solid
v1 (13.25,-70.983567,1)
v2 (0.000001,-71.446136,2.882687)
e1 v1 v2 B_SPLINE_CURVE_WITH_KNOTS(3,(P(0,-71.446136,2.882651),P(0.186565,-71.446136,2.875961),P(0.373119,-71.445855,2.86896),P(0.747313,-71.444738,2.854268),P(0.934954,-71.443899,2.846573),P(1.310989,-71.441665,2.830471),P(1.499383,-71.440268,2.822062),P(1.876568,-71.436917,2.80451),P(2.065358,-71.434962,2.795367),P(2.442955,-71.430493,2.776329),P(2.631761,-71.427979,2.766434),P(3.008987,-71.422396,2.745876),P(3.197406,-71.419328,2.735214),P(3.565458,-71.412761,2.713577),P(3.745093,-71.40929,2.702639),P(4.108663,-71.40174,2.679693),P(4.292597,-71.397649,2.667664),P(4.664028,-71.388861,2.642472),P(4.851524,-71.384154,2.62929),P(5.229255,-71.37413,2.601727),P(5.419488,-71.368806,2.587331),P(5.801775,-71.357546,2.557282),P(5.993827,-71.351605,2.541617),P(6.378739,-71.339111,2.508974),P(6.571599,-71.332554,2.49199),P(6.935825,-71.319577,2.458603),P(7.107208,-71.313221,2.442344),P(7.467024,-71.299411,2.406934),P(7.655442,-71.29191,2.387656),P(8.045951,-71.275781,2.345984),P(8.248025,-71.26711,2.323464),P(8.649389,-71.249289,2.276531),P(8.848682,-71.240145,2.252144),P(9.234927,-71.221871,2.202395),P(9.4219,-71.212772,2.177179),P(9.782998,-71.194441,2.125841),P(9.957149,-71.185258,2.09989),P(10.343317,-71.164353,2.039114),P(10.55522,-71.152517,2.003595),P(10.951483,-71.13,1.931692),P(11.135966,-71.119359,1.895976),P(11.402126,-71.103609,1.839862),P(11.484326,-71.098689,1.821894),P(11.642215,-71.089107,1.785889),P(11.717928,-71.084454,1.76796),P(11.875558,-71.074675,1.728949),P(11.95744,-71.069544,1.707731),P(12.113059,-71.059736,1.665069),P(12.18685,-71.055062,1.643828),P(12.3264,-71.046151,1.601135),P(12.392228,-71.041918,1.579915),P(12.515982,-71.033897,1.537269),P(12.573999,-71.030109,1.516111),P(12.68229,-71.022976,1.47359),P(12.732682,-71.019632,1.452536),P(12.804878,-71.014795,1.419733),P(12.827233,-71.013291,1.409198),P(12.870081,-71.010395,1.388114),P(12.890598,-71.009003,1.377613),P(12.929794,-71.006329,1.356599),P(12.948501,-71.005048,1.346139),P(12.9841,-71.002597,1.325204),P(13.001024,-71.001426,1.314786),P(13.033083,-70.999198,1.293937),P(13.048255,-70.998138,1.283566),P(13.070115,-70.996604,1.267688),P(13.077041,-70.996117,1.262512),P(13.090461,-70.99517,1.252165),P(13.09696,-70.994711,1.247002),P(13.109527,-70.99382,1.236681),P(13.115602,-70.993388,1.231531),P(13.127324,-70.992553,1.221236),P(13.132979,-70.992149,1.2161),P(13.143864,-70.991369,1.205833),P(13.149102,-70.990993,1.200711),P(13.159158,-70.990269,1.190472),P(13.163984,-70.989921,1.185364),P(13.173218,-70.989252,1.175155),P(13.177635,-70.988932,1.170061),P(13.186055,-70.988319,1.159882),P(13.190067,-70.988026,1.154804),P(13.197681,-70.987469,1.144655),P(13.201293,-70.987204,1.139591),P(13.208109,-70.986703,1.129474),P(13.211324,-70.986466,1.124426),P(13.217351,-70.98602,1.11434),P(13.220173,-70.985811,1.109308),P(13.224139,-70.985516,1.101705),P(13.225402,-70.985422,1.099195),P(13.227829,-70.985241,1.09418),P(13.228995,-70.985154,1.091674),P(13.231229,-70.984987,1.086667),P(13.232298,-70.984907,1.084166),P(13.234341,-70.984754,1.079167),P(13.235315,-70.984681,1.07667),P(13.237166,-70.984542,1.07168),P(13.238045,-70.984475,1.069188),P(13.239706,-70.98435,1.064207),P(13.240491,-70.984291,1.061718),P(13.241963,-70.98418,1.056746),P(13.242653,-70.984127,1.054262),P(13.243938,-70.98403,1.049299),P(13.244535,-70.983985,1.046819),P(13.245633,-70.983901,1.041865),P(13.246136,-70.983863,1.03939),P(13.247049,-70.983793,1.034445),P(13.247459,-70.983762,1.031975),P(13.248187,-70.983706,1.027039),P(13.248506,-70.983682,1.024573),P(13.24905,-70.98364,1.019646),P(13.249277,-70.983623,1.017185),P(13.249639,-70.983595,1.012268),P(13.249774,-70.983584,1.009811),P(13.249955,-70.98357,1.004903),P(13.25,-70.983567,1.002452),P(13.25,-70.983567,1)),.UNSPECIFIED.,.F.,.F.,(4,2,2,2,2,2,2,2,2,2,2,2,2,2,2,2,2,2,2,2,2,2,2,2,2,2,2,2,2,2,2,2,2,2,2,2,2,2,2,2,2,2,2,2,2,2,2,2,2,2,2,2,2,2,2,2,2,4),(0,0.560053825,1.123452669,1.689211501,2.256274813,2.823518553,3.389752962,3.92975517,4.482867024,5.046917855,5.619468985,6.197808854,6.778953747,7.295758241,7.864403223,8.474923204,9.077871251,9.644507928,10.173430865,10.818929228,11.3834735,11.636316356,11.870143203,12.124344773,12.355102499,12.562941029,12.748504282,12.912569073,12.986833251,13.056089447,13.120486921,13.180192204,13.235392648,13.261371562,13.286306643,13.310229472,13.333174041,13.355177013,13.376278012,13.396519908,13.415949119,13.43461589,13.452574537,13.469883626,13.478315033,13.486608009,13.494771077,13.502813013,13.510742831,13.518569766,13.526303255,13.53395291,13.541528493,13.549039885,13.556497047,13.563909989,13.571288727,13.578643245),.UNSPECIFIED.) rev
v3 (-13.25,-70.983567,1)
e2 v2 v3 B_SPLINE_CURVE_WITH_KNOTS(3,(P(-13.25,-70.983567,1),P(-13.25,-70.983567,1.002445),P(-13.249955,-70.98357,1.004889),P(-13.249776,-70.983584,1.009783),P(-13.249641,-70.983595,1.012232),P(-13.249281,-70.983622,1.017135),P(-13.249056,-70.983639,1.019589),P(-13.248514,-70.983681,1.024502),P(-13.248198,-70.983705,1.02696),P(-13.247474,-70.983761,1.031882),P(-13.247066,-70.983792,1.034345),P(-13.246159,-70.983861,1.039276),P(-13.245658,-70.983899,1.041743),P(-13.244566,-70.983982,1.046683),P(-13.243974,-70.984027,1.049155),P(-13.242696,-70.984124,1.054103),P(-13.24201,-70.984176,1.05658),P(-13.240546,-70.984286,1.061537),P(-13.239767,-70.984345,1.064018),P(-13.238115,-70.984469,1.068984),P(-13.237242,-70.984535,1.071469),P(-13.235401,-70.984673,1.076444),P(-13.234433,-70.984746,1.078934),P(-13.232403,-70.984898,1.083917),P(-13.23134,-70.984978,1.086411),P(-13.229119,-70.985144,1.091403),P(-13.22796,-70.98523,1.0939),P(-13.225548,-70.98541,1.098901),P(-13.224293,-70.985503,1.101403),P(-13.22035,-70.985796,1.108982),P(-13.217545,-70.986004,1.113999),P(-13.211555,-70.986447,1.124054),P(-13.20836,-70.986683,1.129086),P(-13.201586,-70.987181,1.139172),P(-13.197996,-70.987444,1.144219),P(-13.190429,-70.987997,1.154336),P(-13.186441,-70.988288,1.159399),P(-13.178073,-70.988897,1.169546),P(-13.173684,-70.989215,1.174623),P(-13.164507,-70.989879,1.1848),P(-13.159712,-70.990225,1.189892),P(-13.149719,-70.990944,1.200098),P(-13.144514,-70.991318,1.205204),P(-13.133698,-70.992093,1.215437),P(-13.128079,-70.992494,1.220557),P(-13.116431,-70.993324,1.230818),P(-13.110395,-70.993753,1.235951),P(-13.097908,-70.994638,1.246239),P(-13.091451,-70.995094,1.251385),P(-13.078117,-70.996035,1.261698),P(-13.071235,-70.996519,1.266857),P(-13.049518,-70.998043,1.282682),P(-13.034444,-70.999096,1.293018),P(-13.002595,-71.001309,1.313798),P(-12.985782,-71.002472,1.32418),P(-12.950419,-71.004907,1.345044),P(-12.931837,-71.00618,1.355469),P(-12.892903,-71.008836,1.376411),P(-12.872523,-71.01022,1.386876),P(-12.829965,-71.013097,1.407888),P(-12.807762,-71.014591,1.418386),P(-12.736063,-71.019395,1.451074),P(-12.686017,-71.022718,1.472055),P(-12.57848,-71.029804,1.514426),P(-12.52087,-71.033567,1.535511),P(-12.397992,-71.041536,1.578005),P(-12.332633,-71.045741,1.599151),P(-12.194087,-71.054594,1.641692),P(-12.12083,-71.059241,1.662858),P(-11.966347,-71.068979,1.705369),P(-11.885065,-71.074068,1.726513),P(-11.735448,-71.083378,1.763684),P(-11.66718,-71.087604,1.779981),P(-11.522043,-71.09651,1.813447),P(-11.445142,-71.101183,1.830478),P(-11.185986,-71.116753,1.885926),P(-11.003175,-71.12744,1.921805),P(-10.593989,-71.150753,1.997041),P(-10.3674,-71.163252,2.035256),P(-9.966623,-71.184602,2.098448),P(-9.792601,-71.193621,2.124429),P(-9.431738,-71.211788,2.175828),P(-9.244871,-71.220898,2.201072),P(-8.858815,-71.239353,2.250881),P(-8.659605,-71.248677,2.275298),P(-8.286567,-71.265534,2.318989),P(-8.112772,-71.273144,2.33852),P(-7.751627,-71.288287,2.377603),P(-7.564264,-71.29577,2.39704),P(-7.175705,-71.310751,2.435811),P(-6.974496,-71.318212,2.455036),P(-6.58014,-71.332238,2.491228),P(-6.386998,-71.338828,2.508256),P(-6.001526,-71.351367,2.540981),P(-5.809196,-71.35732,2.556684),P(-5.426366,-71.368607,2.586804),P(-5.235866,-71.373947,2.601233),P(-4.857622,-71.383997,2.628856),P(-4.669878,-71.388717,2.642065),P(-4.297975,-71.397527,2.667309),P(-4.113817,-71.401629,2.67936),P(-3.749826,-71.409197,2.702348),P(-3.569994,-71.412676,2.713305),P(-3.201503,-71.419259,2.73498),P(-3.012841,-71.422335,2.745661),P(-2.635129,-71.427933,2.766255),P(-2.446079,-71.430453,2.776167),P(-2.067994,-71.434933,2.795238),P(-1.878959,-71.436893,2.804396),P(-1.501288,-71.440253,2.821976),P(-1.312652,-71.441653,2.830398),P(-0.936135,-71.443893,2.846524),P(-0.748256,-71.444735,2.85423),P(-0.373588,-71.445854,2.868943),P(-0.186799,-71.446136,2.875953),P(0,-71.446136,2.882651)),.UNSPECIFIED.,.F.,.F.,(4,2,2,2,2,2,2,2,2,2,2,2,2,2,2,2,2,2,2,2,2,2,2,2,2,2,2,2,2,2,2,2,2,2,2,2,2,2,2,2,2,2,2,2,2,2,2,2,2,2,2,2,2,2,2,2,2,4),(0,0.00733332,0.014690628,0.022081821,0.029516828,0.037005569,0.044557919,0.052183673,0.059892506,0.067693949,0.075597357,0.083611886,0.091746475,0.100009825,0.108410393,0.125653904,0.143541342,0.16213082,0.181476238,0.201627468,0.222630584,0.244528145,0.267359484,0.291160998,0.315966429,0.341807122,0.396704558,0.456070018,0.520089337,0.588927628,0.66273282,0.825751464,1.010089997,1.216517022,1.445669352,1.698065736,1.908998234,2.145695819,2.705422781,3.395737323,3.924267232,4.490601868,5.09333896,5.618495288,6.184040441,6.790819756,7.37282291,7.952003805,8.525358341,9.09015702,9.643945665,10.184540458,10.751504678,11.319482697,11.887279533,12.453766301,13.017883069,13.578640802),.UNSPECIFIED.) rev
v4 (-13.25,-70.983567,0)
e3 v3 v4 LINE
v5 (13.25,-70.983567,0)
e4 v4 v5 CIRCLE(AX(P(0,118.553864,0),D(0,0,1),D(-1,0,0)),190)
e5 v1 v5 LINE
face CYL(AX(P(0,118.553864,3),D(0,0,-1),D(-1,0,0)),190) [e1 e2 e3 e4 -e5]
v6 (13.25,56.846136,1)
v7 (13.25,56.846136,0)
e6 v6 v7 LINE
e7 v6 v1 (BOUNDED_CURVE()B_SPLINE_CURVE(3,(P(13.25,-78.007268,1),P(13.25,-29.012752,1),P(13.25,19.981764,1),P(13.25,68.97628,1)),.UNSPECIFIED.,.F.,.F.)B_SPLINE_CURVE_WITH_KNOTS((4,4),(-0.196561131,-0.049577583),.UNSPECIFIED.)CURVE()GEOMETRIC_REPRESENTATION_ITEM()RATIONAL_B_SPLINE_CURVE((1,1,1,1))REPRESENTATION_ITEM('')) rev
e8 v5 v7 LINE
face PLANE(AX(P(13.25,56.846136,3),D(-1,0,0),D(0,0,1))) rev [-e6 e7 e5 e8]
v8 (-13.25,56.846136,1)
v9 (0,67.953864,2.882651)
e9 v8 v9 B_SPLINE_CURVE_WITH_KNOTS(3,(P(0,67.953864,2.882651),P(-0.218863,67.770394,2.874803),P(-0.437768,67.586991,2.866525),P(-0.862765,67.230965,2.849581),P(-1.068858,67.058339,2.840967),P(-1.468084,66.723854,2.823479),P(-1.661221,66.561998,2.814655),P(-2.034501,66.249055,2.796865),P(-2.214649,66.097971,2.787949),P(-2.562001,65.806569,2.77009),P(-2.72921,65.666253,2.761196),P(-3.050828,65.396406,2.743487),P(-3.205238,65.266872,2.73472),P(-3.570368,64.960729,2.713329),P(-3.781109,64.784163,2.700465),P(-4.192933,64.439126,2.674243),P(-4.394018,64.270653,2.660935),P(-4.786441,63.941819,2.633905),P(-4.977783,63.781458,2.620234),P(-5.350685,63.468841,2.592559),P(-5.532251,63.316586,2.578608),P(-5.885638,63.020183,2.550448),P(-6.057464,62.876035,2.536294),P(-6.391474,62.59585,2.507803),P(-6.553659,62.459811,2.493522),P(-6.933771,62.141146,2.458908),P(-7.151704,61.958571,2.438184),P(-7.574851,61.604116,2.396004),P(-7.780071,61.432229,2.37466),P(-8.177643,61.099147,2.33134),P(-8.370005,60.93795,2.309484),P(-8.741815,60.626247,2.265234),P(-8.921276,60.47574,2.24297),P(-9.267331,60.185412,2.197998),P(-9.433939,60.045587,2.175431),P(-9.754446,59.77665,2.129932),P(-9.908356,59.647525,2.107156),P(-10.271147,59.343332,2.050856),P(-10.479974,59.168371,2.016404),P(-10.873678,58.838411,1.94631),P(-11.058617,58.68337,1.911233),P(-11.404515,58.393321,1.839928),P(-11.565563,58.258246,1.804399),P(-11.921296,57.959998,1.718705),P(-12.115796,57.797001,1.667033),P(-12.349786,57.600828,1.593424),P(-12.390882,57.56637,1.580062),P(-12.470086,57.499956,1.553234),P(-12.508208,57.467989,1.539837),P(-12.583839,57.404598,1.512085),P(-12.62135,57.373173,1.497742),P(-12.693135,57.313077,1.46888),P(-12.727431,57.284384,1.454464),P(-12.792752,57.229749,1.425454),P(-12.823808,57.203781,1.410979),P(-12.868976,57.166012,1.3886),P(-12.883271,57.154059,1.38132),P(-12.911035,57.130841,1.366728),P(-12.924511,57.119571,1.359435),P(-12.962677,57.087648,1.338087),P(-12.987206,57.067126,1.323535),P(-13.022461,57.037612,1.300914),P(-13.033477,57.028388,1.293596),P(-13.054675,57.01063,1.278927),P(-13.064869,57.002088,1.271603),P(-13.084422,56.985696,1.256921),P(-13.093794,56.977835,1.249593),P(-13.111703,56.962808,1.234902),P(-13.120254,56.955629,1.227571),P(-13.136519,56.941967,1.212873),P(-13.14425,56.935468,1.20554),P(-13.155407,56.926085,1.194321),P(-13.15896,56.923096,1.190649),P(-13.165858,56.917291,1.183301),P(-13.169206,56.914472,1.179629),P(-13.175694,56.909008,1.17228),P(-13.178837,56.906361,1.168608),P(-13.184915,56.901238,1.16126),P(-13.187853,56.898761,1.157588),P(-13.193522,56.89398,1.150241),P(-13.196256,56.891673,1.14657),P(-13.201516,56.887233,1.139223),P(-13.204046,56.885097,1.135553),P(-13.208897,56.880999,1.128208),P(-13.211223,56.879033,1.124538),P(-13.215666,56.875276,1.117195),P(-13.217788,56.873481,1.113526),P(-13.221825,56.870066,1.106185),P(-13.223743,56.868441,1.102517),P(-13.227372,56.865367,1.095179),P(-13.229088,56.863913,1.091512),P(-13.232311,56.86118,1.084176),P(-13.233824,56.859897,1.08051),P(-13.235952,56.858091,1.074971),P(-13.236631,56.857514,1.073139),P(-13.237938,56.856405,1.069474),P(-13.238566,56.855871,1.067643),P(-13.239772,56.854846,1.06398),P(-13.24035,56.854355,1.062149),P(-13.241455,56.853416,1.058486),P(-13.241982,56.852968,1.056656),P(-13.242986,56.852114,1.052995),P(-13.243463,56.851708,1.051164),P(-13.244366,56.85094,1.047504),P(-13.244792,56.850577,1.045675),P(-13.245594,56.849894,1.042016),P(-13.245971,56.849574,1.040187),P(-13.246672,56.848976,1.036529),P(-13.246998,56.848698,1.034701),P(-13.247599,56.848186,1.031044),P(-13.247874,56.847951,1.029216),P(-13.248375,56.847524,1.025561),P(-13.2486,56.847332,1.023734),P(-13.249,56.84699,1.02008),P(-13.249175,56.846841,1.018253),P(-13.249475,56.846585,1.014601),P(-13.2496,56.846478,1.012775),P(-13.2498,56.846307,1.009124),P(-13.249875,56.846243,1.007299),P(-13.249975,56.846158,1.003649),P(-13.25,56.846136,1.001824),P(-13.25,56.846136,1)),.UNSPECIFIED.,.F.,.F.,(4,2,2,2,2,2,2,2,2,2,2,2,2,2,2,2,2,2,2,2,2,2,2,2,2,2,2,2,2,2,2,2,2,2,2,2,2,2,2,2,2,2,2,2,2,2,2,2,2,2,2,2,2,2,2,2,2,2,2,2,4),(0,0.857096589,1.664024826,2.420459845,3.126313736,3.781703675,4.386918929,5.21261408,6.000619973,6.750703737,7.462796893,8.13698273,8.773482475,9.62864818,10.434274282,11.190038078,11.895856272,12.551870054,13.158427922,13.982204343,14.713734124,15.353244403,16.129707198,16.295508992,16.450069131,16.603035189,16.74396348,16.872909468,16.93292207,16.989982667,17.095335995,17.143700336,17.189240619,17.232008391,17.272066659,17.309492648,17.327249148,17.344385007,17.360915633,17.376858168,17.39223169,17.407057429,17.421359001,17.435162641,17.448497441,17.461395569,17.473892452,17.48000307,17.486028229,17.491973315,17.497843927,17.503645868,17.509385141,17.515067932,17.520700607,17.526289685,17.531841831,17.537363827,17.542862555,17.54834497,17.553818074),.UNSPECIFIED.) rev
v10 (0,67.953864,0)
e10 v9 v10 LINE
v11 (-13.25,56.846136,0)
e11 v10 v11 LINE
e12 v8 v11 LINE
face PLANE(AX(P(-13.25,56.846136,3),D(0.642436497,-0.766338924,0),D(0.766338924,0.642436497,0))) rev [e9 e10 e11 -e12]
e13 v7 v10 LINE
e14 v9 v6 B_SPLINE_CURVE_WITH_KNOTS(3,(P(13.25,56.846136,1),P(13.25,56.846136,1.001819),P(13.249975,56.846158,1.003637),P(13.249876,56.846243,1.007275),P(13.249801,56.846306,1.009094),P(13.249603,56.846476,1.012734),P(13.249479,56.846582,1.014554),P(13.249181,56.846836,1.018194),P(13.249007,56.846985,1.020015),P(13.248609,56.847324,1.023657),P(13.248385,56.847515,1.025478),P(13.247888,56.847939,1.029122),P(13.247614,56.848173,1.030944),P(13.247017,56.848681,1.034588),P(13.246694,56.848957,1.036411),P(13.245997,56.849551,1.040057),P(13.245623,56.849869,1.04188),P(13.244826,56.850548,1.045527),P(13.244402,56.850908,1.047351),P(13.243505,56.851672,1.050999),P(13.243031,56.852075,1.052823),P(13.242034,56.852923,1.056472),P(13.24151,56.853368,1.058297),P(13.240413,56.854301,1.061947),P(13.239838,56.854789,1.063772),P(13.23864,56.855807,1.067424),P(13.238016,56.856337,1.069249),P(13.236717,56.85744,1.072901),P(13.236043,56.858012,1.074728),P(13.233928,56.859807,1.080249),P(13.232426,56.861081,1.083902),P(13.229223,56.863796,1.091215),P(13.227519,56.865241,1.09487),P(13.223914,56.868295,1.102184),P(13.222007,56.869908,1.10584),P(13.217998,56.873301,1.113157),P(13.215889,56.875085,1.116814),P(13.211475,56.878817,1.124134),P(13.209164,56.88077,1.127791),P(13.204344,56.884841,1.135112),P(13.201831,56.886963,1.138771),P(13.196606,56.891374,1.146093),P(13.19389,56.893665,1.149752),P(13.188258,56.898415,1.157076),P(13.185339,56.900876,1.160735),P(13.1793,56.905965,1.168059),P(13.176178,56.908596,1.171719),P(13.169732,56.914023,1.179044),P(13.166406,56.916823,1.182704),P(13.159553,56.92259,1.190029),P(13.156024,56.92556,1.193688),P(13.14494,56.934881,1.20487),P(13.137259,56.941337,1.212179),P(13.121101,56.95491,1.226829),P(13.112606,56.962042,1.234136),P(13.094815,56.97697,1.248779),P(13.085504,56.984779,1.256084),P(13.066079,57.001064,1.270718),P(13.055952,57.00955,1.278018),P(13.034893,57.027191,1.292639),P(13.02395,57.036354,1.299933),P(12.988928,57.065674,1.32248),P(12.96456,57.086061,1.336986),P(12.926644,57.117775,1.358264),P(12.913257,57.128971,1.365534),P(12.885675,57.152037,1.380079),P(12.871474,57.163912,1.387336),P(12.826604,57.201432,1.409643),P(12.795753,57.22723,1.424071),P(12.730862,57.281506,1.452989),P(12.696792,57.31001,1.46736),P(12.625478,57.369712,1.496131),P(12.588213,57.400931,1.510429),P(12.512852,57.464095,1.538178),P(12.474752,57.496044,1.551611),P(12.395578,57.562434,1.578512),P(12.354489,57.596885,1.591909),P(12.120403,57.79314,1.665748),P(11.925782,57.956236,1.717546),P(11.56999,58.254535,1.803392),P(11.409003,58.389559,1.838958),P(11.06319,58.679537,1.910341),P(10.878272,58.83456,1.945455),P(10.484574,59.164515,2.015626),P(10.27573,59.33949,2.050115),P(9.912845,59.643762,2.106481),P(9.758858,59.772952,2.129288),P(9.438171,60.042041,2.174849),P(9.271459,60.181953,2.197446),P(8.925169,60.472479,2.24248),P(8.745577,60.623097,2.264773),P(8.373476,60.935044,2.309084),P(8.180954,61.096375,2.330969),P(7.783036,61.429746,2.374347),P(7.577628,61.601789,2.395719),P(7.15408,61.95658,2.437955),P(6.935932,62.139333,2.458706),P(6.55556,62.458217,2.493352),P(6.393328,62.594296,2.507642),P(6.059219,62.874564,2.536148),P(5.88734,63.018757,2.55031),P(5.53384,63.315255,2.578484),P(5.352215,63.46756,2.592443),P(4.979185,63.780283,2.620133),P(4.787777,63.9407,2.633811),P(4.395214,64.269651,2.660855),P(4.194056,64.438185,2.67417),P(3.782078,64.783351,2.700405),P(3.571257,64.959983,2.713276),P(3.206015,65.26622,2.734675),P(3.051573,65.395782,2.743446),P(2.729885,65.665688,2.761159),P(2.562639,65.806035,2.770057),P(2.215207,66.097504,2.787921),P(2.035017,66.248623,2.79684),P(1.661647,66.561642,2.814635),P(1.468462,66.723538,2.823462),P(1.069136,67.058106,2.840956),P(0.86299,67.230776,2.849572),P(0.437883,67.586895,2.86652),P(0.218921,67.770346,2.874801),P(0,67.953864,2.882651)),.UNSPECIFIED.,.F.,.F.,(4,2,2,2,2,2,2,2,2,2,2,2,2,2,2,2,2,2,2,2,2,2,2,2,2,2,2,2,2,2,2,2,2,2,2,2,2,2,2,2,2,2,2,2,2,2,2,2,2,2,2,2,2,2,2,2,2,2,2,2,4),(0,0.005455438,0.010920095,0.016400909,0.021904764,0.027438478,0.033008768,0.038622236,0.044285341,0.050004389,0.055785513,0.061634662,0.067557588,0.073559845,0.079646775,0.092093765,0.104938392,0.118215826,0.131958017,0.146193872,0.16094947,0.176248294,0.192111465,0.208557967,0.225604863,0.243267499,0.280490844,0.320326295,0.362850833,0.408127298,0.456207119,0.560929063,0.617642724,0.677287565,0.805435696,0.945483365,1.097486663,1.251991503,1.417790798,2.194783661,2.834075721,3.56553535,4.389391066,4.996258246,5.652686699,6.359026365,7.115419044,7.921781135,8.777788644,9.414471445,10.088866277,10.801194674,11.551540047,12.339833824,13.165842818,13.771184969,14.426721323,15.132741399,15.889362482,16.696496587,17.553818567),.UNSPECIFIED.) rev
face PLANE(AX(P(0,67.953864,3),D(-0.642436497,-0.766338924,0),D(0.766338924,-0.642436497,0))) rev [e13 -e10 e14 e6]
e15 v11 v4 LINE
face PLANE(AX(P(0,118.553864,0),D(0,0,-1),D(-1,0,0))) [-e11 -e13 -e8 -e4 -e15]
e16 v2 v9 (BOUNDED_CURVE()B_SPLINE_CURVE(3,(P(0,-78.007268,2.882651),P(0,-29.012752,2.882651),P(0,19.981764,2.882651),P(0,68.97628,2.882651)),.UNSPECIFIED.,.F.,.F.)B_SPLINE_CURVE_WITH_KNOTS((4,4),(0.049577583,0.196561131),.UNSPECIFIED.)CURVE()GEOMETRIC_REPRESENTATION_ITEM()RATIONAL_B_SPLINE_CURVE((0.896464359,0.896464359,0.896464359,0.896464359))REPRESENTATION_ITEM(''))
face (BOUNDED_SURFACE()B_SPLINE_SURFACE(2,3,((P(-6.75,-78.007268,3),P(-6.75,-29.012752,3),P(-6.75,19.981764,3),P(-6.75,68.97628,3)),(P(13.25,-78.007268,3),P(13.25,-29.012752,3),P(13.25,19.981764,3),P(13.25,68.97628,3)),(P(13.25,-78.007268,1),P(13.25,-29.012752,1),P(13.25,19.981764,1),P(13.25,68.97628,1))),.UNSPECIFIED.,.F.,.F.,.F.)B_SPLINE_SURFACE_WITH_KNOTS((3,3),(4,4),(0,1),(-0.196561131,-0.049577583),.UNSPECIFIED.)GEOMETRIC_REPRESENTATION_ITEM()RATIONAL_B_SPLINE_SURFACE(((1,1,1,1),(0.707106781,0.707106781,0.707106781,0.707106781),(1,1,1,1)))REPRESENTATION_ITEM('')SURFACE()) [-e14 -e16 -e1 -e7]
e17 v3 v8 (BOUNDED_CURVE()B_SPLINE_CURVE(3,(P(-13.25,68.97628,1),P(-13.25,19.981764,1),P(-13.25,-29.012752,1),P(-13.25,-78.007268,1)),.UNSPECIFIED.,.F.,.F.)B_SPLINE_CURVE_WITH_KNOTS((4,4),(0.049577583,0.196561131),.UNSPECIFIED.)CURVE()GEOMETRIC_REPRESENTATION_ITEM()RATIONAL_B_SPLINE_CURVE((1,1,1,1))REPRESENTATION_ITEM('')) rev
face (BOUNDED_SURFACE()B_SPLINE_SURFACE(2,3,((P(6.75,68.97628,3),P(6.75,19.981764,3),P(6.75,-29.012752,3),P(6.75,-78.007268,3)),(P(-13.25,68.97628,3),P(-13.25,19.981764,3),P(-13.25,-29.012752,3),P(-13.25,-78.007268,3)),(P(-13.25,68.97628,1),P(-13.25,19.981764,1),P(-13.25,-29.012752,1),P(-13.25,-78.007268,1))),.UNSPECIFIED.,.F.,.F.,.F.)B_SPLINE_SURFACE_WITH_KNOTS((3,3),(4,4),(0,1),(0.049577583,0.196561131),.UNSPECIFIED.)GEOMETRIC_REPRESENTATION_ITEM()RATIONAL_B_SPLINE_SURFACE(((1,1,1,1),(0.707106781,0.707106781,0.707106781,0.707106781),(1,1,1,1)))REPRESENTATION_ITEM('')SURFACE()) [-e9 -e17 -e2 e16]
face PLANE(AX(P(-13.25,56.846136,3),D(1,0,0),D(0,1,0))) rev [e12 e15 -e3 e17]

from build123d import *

# Parameters (mm, degrees)
EXTRUDE_1_DEPTH = 3
FILLET_1_SIZE   = 2
FILLET_1_SIZE_2 = 20


with BuildPart() as part:
    # 스케치1 → 보스-돌출1 (new body)
    with BuildSketch(Plane.XY):
        with BuildLine():
            Line((-13.25, 56.84613648), (0, 67.95386352))
            Line((0, 67.95386352), (13.25, 56.84613648))
            Line((13.25, 56.84613648), (13.25, -70.98356682))
            ThreePointArc((13.25, -70.98356682), (0, -71.44613648), (-13.25, -70.98356682))
            Line((-13.25, -70.98356682), (-13.25, 56.84613648))
        make_face()
    extrude(amount=EXTRUDE_1_DEPTH)

    # 필렛1
    # an asymmetric fillet: 20, 2 mm, written as the material it takes off along each edge
    with BuildSketch(Plane(origin=(-13.25, -120.98356682, 3), x_dir=(0, 0, -1), z_dir=(0, 1, 0)), Plane(origin=(13.25, 106.84613648, 3), x_dir=(0, 0, -1), z_dir=(0, -1, 0))) as fillet_1_piece_1:
        with BuildLine():
            Bezier((FILLET_1_SIZE, 0), (0, 0), (0, -FILLET_1_SIZE_2), weights=[1, 0.707106781, 1])
            Line((0, -FILLET_1_SIZE_2), (0, 0))
            Line((0, 0), (FILLET_1_SIZE, 0))
        make_face()
    extrude(amount=227.8297033, mode=Mode.SUBTRACT)


solid = part.part
